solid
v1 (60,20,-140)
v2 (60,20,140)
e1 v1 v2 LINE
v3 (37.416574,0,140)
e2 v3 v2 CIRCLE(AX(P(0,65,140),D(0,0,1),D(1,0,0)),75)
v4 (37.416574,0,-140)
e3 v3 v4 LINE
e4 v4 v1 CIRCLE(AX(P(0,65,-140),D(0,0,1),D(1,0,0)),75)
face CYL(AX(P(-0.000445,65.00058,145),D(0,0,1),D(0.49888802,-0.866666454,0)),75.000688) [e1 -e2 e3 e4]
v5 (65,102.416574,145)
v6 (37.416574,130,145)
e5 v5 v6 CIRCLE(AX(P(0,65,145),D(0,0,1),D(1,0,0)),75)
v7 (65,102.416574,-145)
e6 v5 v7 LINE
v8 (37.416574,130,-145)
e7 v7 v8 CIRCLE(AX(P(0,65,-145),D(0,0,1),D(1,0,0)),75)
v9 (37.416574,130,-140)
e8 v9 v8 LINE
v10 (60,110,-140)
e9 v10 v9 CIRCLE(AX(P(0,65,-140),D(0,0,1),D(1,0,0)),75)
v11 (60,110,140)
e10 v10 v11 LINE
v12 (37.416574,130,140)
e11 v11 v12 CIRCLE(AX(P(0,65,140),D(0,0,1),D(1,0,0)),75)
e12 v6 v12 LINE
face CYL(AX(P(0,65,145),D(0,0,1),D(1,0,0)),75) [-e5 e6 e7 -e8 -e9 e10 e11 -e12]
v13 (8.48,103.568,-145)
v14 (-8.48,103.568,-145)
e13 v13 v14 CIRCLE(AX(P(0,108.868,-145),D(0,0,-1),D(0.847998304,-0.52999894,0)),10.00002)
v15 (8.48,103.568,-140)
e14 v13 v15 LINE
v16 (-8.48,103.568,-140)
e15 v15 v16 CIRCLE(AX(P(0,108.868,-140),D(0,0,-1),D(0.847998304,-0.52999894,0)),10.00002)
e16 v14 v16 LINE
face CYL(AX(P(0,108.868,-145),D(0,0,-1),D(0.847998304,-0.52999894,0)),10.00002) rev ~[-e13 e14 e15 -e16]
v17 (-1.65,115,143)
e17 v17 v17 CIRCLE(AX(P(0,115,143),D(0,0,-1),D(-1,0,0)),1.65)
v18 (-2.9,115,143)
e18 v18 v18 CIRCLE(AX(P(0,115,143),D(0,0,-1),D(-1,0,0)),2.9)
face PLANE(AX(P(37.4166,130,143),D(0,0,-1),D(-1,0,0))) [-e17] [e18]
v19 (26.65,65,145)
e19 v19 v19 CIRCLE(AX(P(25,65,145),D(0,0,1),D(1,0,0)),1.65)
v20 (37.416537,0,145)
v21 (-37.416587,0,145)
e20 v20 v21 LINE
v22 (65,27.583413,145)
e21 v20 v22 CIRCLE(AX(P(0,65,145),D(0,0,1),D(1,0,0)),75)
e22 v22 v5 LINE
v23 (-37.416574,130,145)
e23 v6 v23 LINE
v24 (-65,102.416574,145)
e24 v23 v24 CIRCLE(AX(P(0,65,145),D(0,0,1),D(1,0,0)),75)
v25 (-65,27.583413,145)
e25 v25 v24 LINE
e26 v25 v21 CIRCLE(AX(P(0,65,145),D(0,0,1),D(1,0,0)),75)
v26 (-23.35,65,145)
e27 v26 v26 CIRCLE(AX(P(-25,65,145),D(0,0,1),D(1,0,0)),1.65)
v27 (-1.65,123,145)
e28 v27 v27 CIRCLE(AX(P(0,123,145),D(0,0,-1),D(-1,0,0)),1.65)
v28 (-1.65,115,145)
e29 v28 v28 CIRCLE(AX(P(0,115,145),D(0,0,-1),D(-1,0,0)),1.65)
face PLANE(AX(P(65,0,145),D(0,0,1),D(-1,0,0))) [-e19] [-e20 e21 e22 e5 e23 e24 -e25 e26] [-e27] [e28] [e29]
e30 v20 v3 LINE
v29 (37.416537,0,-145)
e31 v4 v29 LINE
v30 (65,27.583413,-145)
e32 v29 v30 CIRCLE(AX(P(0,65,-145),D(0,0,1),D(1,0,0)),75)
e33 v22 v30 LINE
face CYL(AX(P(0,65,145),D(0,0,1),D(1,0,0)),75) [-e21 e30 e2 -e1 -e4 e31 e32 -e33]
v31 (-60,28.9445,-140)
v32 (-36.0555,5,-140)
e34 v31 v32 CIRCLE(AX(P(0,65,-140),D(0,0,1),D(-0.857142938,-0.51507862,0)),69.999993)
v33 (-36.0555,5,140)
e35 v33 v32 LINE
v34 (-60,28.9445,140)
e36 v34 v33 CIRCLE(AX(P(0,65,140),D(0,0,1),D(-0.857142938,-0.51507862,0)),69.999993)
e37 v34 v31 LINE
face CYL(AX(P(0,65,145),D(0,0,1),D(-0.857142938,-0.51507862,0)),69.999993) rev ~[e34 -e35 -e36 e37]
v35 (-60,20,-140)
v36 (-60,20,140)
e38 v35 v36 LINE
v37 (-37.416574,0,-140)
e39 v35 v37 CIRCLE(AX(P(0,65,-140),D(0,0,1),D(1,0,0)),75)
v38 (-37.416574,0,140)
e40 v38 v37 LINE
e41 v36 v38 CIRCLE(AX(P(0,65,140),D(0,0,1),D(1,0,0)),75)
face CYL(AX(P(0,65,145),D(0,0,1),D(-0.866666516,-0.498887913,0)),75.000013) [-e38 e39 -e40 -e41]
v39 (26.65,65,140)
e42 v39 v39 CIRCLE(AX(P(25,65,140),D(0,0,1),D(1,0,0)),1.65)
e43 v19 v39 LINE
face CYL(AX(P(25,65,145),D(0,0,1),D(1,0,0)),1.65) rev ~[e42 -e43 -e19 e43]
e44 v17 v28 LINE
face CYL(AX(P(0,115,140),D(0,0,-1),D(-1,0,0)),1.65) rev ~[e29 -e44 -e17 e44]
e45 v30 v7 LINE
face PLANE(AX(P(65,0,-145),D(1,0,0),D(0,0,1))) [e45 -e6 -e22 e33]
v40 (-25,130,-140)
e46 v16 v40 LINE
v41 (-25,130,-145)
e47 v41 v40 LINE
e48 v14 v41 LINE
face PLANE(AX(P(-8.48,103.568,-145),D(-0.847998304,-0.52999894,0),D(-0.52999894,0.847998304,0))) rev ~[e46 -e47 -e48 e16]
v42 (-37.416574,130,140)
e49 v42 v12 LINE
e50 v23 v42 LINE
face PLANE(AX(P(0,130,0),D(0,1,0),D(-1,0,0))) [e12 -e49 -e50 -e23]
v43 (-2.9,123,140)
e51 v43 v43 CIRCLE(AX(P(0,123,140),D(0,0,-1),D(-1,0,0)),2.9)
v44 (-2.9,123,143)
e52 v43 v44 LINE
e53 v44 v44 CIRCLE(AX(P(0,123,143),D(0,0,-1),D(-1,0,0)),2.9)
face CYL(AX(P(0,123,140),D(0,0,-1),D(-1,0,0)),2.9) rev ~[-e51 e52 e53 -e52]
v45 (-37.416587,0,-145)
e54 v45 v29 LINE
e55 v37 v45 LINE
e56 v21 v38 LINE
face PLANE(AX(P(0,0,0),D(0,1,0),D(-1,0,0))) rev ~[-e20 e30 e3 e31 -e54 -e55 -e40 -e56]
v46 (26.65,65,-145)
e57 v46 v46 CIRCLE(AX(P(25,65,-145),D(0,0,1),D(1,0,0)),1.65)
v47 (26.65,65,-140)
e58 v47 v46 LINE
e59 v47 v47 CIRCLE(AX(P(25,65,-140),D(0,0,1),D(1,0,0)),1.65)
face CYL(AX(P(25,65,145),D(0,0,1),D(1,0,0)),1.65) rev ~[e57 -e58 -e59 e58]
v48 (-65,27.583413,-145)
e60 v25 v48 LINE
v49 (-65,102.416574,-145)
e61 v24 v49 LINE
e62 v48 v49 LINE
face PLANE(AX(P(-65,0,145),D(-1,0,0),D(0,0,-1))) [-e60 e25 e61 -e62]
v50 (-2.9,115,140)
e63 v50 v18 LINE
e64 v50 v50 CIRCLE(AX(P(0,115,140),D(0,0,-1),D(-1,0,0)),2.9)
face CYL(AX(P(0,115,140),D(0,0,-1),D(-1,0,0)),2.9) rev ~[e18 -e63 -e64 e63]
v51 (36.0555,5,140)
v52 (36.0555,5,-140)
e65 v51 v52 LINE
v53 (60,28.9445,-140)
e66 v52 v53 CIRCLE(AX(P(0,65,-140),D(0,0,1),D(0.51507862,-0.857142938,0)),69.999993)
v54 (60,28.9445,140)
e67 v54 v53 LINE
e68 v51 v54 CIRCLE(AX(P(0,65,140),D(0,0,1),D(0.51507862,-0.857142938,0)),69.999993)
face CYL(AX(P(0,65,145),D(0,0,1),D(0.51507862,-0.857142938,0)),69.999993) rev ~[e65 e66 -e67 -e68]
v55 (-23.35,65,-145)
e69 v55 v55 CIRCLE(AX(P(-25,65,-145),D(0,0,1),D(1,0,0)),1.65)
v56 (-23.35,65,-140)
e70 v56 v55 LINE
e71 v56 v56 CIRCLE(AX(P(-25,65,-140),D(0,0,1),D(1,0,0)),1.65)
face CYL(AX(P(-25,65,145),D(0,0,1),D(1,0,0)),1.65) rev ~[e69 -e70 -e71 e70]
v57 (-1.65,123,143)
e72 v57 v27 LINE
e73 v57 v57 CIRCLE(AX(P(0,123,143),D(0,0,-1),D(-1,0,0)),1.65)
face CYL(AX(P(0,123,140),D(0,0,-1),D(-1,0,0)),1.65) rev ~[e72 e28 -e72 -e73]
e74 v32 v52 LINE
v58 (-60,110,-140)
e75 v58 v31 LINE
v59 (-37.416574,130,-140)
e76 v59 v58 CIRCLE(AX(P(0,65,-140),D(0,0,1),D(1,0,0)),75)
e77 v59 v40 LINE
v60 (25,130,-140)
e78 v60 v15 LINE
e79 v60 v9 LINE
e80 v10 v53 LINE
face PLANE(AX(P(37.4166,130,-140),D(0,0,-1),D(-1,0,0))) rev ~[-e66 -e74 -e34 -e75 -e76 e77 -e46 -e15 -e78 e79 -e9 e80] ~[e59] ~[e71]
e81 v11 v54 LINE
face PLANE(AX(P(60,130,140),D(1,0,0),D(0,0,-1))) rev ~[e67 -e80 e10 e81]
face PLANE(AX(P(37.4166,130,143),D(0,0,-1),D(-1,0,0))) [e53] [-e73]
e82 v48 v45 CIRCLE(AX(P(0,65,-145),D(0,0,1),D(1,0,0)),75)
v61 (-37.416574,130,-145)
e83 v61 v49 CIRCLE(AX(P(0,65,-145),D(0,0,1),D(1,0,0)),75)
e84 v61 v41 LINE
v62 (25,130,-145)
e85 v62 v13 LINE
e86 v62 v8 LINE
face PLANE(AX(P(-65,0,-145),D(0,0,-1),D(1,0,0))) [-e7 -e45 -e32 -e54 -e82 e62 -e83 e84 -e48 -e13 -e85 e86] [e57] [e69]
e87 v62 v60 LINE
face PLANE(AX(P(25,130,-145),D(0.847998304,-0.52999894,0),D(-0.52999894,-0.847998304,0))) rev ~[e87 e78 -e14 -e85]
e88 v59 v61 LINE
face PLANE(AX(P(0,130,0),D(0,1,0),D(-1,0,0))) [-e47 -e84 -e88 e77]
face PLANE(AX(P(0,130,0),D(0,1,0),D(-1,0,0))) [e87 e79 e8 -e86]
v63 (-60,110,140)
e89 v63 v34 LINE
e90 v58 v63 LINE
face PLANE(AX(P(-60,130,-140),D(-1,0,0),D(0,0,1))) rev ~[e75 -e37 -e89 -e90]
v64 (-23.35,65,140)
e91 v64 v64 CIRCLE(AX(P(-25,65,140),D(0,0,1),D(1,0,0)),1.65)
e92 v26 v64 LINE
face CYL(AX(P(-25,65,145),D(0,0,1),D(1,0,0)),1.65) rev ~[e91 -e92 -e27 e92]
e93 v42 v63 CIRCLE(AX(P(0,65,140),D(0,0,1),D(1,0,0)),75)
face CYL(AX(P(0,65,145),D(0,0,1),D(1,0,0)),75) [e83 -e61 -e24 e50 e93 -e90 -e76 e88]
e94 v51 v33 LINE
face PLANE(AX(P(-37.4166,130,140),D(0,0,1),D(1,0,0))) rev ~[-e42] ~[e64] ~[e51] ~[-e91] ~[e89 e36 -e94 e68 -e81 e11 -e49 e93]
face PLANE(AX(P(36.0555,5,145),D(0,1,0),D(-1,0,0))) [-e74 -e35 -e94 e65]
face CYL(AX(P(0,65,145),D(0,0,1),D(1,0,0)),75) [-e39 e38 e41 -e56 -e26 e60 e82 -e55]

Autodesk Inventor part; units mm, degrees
ref_plane "YZ Plane" through (0, 0, 0) normal (1, 0, 0) x (0, 1, 0)
ref_plane "XZ Plane" through (0, 0, 0) normal (0, 1, 0) x (-1, 0, 0)
ref_plane "XY Plane" through (0, 0, 0) normal (0, 0, 1) x (1, 0, 0)
sketch "Sketch1" plane through (0, 0, 0) normal (0, 1, 0) x (-1, 0, 0)
  line L0 (-65, 145) -> (65, 145)
  line L1 (65, 145) -> (65, -145)
  line L2 (65, -145) -> (-65, -145)
  line L3 (-65, -145) -> (-65, 145)
  line L4 (-65, 145) -> (65, -145) construction
  line L5 (65, 145) -> (-65, -145) construction
  point P0 (0, 0)
  dimension "d0" = 130
  dimension "d1" = 290
extrude "Extrusion1" add sketch "Sketch1" along normal blind 130
sketch "Sketch2" plane through (-65, 0, 145) normal (0, 0, 1) x (1, 0, 0)
  line L0 (0, 0) -> (130, 0) projected
  line L1 (130, 0) -> (130, 130) projected
  line L2 (0, 130) -> (130, 130) projected
  line L3 (0, 0) -> (0, 130) projected
  circle A0 centre (65, 65) radius 75
  point P0 (65, 0)
  point P1 (130, 65)
  point P2 (65, 130)
  point P3 (27.5834, 0)
  point P4 (0, 27.5834)
  point P5 (130, 27.5834)
  point P6 (102.4166, 0)
  point P7 (0, 102.4166)
  point P8 (27.5834, 130)
  point P9 (102.4166, 130)
  point P10 (130, 102.4166)
  dimension "d4" = 150
extrude "Extrusion2" cut sketch "Sketch2" against normal through all contours L3 A0 L0 | A0 L1 L0 | L3 L2 A0 | A0 L2 L1
sketch "Sketch3" plane through (0, 130, 0) normal (0, 1, 0) x (1, 0, 0)
  line L0 (-37.4166, 145) -> (-37.4166, -145) projected
  line L1 (-37.4166, -145) -> (37.4166, -145) projected
  line L2 (37.4166, -145) -> (37.4166, 145) projected
  line L3 (37.4166, 145) -> (-37.4166, 145) projected
  line L4 (37.4166, 145) -> (65, 145) projected
  line L5 (37.4166, -145) -> (37.4166, 145) projected
  line L6 (65, -145) -> (37.4166, -145) projected
  line L7 (65, 145) -> (65, -145) projected
  line L8 (-65, 145) -> (-37.4166, 145) projected
  line L9 (-65, -145) -> (-65, 145) projected
  line L10 (-37.4166, -145) -> (-65, -145) projected
  line L11 (-37.4166, 145) -> (-37.4166, -145) projected
  line L12 (-60, -140) -> (60, -140)
  line L13 (60, -140) -> (60, 140)
  line L14 (60, 140) -> (-60, 140)
  line L15 (-60, 140) -> (-60, -140)
  line L16 (-60, -140) -> (60, 140) construction
  line L17 (60, -140) -> (-60, 140) construction
  point P0 (0, 0)
  dimension "d7" = 5
  dimension "d8" = 5
extrude "Extrusion3" cut sketch "Sketch3" against normal through all contours L14 L2 L12 L0 | L0 L12 L15 L14 | L14 L13 L12 L2
sketch "Sketch4" plane through (-37.4166, 0, 145) normal (0, 0, 1) x (1, 0, 0)
  arc A0 (74.8331, 0) -> (102.4166, 27.5834) centre (37.4166, 65) ccw projected
  line L0 (102.4166, 27.5834) -> (102.4166, 102.4166) projected
  arc A1 (102.4166, 102.4166) -> (74.8331, 130) centre (37.4166, 65) ccw projected
  line L1 (0, 130) -> (74.8331, 130) projected
  arc A2 (0, 130) -> (-27.5834, 102.4166) centre (37.4166, 65) ccw projected
  line L2 (-27.5834, 27.5834) -> (-27.5834, 102.4166) projected
  arc A3 (-27.5834, 27.5834) -> (0, 0) centre (37.4166, 65) ccw projected
  line L3 (0, 0) -> (74.8331, 0) projected
  arc A4 (-22.5834, 28.9445) -> (1.3611, 5) centre (37.4166, 65) ccw
  line L4 (-22.5834, 28.9445) -> (-22.5834, 101.0555)
  arc A5 (1.3611, 125) -> (-22.5834, 101.0555) centre (37.4166, 65) ccw
  line L5 (1.3611, 125) -> (73.4721, 125)
  arc A6 (97.4166, 101.0555) -> (73.4721, 125) centre (37.4166, 65) ccw
  line L6 (97.4166, 101.0555) -> (97.4166, 28.9445)
  arc A7 (73.4721, 5) -> (97.4166, 28.9445) centre (37.4166, 65) ccw
  line L7 (73.4721, 5) -> (1.3611, 5)
  line L8 (-27.5834, 27.5834) -> (-22.5834, 28.9445)
  line L9 (97.4166, 28.9445) -> (102.4166, 27.5834)
  point P0 (37.4166, 0)
  dimension "d11" = 5
extrude "Extrusion4" add sketch "Sketch4" against normal up to surface (290 mm away) contours L3 A3 L8 A4 L7 A7 L9 A0
sketch "Sketch5" plane through (-37.4166, 0, 145) normal (0, 0, 1) x (1, 0, 0)
  line L0 (102.4166, 27.5834) -> (102.4166, 102.4166) projected
  arc A0 (102.4166, 102.4166) -> (74.8331, 130) centre (37.4166, 65) ccw projected
  line L1 (0, 130) -> (74.8331, 130) projected
  arc A1 (0, 130) -> (-27.5834, 102.4166) centre (37.4166, 65) ccw projected
  line L2 (-27.5834, 27.5834) -> (-27.5834, 102.4166) projected
  arc A2 (-27.5834, 27.5834) -> (0, 0) centre (37.4166, 65) ccw projected
  line L3 (0, 0) -> (74.8331, 0) projected
  arc A3 (74.8331, 0) -> (102.4166, 27.5834) centre (37.4166, 65) ccw projected
  line L4 (12.4166, 65) -> (62.4166, 65) construction
  circle A4 centre (62.4166, 65) radius 1.65
  circle A5 centre (12.4166, 65) radius 1.65
  point P0 (37.4166, 0)
  dimension "d14" = 3.3
  dimension "d15" = 3.3
  dimension "d16" = 50
extrude "Extrusion5" cut sketch "Sketch5" against normal through all contours A4 | A5
sketch "Sketch7" plane through (37.4166, 0, -145) normal (0, 0, -1) x (-1, 0, 0)
  circle A0 centre (12.4166, 65) radius 1.65 projected
  circle A1 centre (62.4166, 65) radius 1.65 projected
  arc A2 (-27.5834, 27.5834) -> (0, 0) centre (37.4166, 65) ccw projected
  line L0 (0, 0) -> (74.8331, 0) projected
  arc A3 (74.8331, 0) -> (102.4166, 27.5834) centre (37.4166, 65) ccw projected
  line L1 (102.4166, 27.5834) -> (102.4166, 102.4166) projected
  arc A4 (102.4166, 102.4166) -> (74.8331, 130) centre (37.4166, 65) ccw projected
  line L2 (0, 130) -> (74.8331, 130) projected
  arc A5 (0, 130) -> (-27.5834, 102.4166) centre (37.4166, 65) ccw projected
  line L3 (-27.5834, 27.5834) -> (-27.5834, 102.4166) projected
  line L4 (12.4166, 130) -> (28.9366, 103.568)
  line L5 (45.8966, 103.568) -> (62.4166, 130)
  arc A6 (28.9366, 103.568) -> (45.8966, 103.568) centre (37.4166, 108.868) ccw
  point P0 (37.4166, 0)
  point P1 (37.4166, 90)
  dimension "d24" = 50
  dimension "d25" = 40
  dimension "d26" = 10
extrude "Extrusion7" cut sketch "Sketch7" against normal blind 10 contours L2 L5 A6 L4
sketch "Sketch10" plane through (37.4166, 130, 140) normal (0, 0, -1) x (-1, 0, 0)
  circle A0 centre (12.4166, -65) radius 1.65 projected
  circle A1 centre (62.4166, -65) radius 1.65 projected
  arc A2 (73.4721, -125) -> (97.4166, -101.0555) centre (37.4166, -65) ccw projected
  line L0 (97.4166, -20) -> (97.4166, -101.0555) projected
  arc A3 (97.4166, -20) -> (74.8331, 0) centre (37.4166, -65) ccw projected
  line L1 (0, 0) -> (74.8331, 0) projected
  arc A4 (0, 0) -> (-22.5834, -20) centre (37.4166, -65) ccw projected
  line L2 (-22.5834, -20) -> (-22.5834, -101.0555) projected
  arc A5 (-22.5834, -101.0555) -> (1.3611, -125) centre (37.4166, -65) ccw projected
  line L3 (1.3611, -125) -> (73.4721, -125) projected
  circle A6 centre (37.4166, -7) radius 1.65
  circle A7 centre (37.4166, -15) radius 1.65
  point P0 (37.4166, -130)
  point P1 (37.4166, 0)
  dimension "d36" = 3.3
  dimension "d37" = 3.3
  dimension "d38" = 8
  dimension "d39" = 7
extrude "Extrusion10" cut sketch "Sketch10" against normal through all contours A6 | A7
sketch "Sketch11" plane through (37.4166, 130, 140) normal (0, 0, -1) x (-1, 0, 0)
  circle A0 centre (37.4166, -15) radius 1.65 projected
  circle A1 centre (37.4166, -7) radius 1.65 projected
  circle A2 centre (12.4166, -65) radius 1.65 projected
  circle A3 centre (62.4166, -65) radius 1.65 projected
  arc A4 (73.4721, -125) -> (97.4166, -101.0555) centre (37.4166, -65) ccw projected
  line L0 (97.4166, -20) -> (97.4166, -101.0555) projected
  arc A5 (97.4166, -20) -> (74.8331, 0) centre (37.4166, -65) ccw projected
  line L1 (0, 0) -> (74.8331, 0) projected
  arc A6 (0, 0) -> (-22.5834, -20) centre (37.4166, -65) ccw projected
  line L2 (-22.5834, -20) -> (-22.5834, -101.0555) projected
  arc A7 (-22.5834, -101.0555) -> (1.3611, -125) centre (37.4166, -65) ccw projected
  line L3 (1.3611, -125) -> (73.4721, -125) projected
  circle A8 centre (37.4166, -7) radius 2.9
  circle A9 centre (37.4166, -15) radius 2.9
  point P0 (37.4166, -130)
  dimension "d42" = 5.8
extrude "Extrusion11" cut sketch "Sketch11" against normal blind 3 contours A0 | A1 | A8 | A9
properties part number "CAJA_V2" material "Steel, Mild, Welded"
